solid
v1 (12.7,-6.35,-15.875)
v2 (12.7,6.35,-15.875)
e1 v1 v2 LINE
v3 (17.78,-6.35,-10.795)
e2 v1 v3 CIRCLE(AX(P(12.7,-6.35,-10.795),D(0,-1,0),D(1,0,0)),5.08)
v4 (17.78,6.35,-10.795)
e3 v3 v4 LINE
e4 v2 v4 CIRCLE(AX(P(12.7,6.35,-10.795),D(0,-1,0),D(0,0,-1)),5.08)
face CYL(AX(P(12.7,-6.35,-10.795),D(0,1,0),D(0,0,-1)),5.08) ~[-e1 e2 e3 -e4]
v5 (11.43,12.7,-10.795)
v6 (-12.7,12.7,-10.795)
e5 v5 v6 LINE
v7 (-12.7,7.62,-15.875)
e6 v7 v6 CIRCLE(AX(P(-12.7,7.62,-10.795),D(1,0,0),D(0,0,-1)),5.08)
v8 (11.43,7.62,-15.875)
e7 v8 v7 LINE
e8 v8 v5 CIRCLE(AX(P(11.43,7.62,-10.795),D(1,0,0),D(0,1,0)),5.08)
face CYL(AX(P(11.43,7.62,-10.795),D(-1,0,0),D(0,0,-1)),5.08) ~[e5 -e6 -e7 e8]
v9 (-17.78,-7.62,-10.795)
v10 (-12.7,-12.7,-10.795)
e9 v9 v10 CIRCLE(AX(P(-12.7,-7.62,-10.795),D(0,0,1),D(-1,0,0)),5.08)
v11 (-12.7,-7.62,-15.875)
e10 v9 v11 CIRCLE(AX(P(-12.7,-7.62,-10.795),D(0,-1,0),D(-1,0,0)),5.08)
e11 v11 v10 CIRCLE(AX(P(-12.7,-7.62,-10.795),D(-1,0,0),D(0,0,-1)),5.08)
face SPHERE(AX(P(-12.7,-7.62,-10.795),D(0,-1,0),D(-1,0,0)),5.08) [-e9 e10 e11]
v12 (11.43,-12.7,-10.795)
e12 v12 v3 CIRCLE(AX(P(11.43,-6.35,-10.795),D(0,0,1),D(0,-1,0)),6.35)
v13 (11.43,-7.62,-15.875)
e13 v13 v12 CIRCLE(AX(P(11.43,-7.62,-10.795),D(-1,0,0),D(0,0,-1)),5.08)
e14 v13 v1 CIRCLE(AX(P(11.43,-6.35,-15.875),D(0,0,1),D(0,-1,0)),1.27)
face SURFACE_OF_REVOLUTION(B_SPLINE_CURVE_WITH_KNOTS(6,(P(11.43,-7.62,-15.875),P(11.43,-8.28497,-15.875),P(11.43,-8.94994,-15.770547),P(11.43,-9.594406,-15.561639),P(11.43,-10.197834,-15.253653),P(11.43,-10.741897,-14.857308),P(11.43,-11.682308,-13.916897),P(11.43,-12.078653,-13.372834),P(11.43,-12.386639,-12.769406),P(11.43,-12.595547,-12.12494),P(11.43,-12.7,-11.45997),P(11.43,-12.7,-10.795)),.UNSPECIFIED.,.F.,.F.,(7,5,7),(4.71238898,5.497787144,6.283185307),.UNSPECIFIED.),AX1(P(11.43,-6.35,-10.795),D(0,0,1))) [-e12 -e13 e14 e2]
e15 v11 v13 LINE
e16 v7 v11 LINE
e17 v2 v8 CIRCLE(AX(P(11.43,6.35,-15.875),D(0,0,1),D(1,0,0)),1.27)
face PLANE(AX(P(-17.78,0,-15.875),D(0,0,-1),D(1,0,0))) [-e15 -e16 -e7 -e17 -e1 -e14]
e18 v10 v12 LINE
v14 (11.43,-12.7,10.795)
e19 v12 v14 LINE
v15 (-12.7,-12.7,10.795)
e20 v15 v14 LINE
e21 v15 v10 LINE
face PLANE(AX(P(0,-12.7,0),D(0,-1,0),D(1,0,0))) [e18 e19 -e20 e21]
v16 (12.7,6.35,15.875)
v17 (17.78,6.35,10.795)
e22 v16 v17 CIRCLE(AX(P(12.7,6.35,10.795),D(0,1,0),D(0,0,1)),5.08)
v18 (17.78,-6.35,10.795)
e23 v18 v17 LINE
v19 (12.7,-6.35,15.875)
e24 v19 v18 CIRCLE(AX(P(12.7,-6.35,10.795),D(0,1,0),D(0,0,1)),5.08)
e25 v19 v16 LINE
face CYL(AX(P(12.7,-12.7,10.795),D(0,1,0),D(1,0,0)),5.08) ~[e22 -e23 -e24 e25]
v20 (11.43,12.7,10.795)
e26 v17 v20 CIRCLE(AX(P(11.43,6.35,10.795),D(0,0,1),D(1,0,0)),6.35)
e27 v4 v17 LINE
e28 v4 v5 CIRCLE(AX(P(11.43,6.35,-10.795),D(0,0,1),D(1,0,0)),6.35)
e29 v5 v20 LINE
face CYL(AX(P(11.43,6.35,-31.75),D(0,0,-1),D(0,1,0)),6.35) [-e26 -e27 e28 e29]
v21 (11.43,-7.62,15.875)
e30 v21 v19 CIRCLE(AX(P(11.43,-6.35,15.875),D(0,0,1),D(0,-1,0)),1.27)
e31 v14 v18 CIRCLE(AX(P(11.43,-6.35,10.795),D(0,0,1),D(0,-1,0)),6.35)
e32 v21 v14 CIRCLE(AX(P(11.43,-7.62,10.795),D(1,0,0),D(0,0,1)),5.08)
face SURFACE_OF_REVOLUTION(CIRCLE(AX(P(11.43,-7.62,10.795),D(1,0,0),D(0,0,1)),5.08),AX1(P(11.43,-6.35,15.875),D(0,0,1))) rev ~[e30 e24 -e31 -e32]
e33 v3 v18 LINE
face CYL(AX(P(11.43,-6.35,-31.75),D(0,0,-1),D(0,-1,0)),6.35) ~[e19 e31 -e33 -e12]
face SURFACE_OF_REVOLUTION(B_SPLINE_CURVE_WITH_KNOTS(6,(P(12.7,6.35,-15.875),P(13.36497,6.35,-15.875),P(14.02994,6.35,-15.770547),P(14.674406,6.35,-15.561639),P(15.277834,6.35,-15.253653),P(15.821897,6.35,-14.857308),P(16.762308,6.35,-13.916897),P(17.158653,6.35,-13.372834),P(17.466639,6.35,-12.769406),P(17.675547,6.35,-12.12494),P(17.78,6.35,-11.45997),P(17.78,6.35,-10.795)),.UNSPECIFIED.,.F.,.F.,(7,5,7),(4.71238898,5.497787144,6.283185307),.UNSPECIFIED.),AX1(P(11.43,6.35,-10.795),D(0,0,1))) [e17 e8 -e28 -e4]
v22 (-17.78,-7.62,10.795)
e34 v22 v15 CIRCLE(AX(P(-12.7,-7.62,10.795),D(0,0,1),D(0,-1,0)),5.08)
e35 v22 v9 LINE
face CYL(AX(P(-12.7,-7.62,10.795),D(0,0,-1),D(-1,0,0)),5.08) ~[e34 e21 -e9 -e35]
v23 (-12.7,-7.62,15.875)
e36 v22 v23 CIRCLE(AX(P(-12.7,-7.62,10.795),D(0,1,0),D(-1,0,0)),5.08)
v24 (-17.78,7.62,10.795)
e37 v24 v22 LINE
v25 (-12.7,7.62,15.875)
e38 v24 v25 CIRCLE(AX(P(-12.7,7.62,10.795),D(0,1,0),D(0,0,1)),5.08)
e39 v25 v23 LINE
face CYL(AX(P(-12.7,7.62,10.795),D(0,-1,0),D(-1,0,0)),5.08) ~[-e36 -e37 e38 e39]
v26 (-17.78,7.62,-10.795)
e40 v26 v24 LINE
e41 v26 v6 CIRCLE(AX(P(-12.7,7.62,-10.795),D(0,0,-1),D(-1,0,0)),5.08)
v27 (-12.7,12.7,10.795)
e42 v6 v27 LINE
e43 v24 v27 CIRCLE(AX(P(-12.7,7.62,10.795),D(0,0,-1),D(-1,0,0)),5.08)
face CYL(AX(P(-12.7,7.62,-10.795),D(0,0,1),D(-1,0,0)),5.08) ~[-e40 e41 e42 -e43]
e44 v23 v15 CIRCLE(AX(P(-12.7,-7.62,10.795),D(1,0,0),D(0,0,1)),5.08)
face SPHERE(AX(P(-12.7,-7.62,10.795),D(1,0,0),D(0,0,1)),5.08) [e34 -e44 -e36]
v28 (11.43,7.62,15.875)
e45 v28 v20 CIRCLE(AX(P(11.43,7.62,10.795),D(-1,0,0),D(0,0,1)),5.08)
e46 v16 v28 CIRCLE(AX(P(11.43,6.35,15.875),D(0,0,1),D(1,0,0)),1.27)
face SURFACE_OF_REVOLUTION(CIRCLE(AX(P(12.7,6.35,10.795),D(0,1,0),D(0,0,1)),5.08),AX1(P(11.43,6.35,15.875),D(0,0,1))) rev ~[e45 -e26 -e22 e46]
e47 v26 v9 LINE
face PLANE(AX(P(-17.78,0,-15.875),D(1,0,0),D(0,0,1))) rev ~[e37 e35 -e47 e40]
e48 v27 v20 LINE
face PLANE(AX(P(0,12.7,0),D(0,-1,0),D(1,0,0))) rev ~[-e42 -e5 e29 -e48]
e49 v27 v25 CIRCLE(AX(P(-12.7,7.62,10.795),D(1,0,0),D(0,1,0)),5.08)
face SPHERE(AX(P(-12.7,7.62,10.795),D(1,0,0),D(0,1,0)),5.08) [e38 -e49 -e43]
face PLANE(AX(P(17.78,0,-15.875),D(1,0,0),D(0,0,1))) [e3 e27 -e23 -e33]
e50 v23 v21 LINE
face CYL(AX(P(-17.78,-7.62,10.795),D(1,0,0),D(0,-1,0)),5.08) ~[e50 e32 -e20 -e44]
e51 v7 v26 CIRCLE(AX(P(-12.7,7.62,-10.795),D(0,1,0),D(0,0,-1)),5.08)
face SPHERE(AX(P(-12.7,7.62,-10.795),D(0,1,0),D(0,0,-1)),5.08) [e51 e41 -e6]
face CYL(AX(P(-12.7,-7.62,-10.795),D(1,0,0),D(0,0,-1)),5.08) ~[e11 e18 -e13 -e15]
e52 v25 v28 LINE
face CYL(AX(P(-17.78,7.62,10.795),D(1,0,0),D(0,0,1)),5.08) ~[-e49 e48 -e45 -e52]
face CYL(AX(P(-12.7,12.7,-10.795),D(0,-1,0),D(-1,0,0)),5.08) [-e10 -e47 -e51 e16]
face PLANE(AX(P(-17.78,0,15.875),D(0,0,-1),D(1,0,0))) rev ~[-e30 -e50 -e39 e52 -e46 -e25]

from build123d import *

# Parameters (mm, degrees)
F0_W        = 35.56
F0_H        = 31.75
F1_DEPTH    = 12.7
F2_R        = 5.08
F3_T1_DEPTH = 47.625
F3_T4_ANGLE = 90
F3_T6_ANGLE = 90
F4_R        = 5.08
F5_R        = 5.08


# Not quite as in the source:
# - a fillet or chamfer that OpenCascade refuses, or shapes differently, is made with other operations: its cross-section is extruded or revolved along the edge and cut away or added


with BuildPart() as f1:
    # F0 (on Front) → F1 (new body, symmetric)
    with BuildSketch(Plane.XZ):
        Rectangle(F0_W, F0_H)
    extrude(amount=F1_DEPTH, both=True)

    # F2
    f2_edges = [f1.edges().sort_by_distance(p)[0] for p in [
        (0, -12.7, 15.875),
        (0, 12.7, 15.875),
        (17.78, 0, 15.875),
    ]]
    fillet(f2_edges, radius=F2_R)

    # F3: fillet of radius 6.35 on 2 edges, made by hand

    # F3_s2 → F3_t1 (cut)
    with BuildSketch(Plane.XY.offset(-31.75)):
        with BuildLine():
            ThreePointArc((11.43, -12.7), (15.9201280605, -10.8401280605), (17.78, -6.35))
            Line((17.78, -6.35), (17.78, -12.7))
            Line((17.78, -12.7), (11.43, -12.7))
        make_face()
        with BuildLine():
            ThreePointArc((11.43, 12.7), (15.9201280605, 10.8401280605), (17.78, 6.35))
            Line((17.78, 6.35), (17.78, 12.7))
            Line((17.78, 12.7), (11.43, 12.7))
        make_face()
    extrude(amount=F3_T1_DEPTH, mode=Mode.SUBTRACT)

    # F3_s3 → F3_t4 (revolve, cut)
    with BuildSketch(Plane.XZ.offset(-6.35)):
        with BuildLine():
            ThreePointArc((12.7, 15.875), (16.2921024484, 14.3871024484), (17.78, 10.795))
            Line((17.78, 10.795), (17.78, 15.875))
            Line((17.78, 15.875), (12.7, 15.875))
        make_face()
    revolve(axis=Axis((11.43, 6.35, 15.875), (0, 0, 1)), revolution_arc=F3_T4_ANGLE, mode=Mode.SUBTRACT)

    # F3_s5 → F3_t6 (revolve, cut)
    with BuildSketch(Plane.YZ.offset(11.43)):
        with BuildLine():
            ThreePointArc((-7.62, 15.875), (-11.2121024484, 14.3871024484), (-12.7, 10.795))
            Line((-12.7, 10.795), (-12.7, 15.875))
            Line((-12.7, 15.875), (-7.62, 15.875))
        make_face()
    revolve(axis=Axis((11.43, -6.35, 15.875), (0, 0, 1)), revolution_arc=F3_T6_ANGLE, mode=Mode.SUBTRACT)

    # F4
    f4_edges = [f1.edges().sort_by_distance(p)[0] for p in [
        (-17.78, 0, -15.875),
    ]]
    fillet(f4_edges, radius=F4_R)

    # F5
    f5_edges = [f1.edges().sort_by_distance(p)[0] for p in [
        (-16.292102, -12.7, -14.387102),
        (-16.292102, 12.7, -14.387102),
    ]]
    fillet(f5_edges, radius=F5_R)


solid = f1.part
